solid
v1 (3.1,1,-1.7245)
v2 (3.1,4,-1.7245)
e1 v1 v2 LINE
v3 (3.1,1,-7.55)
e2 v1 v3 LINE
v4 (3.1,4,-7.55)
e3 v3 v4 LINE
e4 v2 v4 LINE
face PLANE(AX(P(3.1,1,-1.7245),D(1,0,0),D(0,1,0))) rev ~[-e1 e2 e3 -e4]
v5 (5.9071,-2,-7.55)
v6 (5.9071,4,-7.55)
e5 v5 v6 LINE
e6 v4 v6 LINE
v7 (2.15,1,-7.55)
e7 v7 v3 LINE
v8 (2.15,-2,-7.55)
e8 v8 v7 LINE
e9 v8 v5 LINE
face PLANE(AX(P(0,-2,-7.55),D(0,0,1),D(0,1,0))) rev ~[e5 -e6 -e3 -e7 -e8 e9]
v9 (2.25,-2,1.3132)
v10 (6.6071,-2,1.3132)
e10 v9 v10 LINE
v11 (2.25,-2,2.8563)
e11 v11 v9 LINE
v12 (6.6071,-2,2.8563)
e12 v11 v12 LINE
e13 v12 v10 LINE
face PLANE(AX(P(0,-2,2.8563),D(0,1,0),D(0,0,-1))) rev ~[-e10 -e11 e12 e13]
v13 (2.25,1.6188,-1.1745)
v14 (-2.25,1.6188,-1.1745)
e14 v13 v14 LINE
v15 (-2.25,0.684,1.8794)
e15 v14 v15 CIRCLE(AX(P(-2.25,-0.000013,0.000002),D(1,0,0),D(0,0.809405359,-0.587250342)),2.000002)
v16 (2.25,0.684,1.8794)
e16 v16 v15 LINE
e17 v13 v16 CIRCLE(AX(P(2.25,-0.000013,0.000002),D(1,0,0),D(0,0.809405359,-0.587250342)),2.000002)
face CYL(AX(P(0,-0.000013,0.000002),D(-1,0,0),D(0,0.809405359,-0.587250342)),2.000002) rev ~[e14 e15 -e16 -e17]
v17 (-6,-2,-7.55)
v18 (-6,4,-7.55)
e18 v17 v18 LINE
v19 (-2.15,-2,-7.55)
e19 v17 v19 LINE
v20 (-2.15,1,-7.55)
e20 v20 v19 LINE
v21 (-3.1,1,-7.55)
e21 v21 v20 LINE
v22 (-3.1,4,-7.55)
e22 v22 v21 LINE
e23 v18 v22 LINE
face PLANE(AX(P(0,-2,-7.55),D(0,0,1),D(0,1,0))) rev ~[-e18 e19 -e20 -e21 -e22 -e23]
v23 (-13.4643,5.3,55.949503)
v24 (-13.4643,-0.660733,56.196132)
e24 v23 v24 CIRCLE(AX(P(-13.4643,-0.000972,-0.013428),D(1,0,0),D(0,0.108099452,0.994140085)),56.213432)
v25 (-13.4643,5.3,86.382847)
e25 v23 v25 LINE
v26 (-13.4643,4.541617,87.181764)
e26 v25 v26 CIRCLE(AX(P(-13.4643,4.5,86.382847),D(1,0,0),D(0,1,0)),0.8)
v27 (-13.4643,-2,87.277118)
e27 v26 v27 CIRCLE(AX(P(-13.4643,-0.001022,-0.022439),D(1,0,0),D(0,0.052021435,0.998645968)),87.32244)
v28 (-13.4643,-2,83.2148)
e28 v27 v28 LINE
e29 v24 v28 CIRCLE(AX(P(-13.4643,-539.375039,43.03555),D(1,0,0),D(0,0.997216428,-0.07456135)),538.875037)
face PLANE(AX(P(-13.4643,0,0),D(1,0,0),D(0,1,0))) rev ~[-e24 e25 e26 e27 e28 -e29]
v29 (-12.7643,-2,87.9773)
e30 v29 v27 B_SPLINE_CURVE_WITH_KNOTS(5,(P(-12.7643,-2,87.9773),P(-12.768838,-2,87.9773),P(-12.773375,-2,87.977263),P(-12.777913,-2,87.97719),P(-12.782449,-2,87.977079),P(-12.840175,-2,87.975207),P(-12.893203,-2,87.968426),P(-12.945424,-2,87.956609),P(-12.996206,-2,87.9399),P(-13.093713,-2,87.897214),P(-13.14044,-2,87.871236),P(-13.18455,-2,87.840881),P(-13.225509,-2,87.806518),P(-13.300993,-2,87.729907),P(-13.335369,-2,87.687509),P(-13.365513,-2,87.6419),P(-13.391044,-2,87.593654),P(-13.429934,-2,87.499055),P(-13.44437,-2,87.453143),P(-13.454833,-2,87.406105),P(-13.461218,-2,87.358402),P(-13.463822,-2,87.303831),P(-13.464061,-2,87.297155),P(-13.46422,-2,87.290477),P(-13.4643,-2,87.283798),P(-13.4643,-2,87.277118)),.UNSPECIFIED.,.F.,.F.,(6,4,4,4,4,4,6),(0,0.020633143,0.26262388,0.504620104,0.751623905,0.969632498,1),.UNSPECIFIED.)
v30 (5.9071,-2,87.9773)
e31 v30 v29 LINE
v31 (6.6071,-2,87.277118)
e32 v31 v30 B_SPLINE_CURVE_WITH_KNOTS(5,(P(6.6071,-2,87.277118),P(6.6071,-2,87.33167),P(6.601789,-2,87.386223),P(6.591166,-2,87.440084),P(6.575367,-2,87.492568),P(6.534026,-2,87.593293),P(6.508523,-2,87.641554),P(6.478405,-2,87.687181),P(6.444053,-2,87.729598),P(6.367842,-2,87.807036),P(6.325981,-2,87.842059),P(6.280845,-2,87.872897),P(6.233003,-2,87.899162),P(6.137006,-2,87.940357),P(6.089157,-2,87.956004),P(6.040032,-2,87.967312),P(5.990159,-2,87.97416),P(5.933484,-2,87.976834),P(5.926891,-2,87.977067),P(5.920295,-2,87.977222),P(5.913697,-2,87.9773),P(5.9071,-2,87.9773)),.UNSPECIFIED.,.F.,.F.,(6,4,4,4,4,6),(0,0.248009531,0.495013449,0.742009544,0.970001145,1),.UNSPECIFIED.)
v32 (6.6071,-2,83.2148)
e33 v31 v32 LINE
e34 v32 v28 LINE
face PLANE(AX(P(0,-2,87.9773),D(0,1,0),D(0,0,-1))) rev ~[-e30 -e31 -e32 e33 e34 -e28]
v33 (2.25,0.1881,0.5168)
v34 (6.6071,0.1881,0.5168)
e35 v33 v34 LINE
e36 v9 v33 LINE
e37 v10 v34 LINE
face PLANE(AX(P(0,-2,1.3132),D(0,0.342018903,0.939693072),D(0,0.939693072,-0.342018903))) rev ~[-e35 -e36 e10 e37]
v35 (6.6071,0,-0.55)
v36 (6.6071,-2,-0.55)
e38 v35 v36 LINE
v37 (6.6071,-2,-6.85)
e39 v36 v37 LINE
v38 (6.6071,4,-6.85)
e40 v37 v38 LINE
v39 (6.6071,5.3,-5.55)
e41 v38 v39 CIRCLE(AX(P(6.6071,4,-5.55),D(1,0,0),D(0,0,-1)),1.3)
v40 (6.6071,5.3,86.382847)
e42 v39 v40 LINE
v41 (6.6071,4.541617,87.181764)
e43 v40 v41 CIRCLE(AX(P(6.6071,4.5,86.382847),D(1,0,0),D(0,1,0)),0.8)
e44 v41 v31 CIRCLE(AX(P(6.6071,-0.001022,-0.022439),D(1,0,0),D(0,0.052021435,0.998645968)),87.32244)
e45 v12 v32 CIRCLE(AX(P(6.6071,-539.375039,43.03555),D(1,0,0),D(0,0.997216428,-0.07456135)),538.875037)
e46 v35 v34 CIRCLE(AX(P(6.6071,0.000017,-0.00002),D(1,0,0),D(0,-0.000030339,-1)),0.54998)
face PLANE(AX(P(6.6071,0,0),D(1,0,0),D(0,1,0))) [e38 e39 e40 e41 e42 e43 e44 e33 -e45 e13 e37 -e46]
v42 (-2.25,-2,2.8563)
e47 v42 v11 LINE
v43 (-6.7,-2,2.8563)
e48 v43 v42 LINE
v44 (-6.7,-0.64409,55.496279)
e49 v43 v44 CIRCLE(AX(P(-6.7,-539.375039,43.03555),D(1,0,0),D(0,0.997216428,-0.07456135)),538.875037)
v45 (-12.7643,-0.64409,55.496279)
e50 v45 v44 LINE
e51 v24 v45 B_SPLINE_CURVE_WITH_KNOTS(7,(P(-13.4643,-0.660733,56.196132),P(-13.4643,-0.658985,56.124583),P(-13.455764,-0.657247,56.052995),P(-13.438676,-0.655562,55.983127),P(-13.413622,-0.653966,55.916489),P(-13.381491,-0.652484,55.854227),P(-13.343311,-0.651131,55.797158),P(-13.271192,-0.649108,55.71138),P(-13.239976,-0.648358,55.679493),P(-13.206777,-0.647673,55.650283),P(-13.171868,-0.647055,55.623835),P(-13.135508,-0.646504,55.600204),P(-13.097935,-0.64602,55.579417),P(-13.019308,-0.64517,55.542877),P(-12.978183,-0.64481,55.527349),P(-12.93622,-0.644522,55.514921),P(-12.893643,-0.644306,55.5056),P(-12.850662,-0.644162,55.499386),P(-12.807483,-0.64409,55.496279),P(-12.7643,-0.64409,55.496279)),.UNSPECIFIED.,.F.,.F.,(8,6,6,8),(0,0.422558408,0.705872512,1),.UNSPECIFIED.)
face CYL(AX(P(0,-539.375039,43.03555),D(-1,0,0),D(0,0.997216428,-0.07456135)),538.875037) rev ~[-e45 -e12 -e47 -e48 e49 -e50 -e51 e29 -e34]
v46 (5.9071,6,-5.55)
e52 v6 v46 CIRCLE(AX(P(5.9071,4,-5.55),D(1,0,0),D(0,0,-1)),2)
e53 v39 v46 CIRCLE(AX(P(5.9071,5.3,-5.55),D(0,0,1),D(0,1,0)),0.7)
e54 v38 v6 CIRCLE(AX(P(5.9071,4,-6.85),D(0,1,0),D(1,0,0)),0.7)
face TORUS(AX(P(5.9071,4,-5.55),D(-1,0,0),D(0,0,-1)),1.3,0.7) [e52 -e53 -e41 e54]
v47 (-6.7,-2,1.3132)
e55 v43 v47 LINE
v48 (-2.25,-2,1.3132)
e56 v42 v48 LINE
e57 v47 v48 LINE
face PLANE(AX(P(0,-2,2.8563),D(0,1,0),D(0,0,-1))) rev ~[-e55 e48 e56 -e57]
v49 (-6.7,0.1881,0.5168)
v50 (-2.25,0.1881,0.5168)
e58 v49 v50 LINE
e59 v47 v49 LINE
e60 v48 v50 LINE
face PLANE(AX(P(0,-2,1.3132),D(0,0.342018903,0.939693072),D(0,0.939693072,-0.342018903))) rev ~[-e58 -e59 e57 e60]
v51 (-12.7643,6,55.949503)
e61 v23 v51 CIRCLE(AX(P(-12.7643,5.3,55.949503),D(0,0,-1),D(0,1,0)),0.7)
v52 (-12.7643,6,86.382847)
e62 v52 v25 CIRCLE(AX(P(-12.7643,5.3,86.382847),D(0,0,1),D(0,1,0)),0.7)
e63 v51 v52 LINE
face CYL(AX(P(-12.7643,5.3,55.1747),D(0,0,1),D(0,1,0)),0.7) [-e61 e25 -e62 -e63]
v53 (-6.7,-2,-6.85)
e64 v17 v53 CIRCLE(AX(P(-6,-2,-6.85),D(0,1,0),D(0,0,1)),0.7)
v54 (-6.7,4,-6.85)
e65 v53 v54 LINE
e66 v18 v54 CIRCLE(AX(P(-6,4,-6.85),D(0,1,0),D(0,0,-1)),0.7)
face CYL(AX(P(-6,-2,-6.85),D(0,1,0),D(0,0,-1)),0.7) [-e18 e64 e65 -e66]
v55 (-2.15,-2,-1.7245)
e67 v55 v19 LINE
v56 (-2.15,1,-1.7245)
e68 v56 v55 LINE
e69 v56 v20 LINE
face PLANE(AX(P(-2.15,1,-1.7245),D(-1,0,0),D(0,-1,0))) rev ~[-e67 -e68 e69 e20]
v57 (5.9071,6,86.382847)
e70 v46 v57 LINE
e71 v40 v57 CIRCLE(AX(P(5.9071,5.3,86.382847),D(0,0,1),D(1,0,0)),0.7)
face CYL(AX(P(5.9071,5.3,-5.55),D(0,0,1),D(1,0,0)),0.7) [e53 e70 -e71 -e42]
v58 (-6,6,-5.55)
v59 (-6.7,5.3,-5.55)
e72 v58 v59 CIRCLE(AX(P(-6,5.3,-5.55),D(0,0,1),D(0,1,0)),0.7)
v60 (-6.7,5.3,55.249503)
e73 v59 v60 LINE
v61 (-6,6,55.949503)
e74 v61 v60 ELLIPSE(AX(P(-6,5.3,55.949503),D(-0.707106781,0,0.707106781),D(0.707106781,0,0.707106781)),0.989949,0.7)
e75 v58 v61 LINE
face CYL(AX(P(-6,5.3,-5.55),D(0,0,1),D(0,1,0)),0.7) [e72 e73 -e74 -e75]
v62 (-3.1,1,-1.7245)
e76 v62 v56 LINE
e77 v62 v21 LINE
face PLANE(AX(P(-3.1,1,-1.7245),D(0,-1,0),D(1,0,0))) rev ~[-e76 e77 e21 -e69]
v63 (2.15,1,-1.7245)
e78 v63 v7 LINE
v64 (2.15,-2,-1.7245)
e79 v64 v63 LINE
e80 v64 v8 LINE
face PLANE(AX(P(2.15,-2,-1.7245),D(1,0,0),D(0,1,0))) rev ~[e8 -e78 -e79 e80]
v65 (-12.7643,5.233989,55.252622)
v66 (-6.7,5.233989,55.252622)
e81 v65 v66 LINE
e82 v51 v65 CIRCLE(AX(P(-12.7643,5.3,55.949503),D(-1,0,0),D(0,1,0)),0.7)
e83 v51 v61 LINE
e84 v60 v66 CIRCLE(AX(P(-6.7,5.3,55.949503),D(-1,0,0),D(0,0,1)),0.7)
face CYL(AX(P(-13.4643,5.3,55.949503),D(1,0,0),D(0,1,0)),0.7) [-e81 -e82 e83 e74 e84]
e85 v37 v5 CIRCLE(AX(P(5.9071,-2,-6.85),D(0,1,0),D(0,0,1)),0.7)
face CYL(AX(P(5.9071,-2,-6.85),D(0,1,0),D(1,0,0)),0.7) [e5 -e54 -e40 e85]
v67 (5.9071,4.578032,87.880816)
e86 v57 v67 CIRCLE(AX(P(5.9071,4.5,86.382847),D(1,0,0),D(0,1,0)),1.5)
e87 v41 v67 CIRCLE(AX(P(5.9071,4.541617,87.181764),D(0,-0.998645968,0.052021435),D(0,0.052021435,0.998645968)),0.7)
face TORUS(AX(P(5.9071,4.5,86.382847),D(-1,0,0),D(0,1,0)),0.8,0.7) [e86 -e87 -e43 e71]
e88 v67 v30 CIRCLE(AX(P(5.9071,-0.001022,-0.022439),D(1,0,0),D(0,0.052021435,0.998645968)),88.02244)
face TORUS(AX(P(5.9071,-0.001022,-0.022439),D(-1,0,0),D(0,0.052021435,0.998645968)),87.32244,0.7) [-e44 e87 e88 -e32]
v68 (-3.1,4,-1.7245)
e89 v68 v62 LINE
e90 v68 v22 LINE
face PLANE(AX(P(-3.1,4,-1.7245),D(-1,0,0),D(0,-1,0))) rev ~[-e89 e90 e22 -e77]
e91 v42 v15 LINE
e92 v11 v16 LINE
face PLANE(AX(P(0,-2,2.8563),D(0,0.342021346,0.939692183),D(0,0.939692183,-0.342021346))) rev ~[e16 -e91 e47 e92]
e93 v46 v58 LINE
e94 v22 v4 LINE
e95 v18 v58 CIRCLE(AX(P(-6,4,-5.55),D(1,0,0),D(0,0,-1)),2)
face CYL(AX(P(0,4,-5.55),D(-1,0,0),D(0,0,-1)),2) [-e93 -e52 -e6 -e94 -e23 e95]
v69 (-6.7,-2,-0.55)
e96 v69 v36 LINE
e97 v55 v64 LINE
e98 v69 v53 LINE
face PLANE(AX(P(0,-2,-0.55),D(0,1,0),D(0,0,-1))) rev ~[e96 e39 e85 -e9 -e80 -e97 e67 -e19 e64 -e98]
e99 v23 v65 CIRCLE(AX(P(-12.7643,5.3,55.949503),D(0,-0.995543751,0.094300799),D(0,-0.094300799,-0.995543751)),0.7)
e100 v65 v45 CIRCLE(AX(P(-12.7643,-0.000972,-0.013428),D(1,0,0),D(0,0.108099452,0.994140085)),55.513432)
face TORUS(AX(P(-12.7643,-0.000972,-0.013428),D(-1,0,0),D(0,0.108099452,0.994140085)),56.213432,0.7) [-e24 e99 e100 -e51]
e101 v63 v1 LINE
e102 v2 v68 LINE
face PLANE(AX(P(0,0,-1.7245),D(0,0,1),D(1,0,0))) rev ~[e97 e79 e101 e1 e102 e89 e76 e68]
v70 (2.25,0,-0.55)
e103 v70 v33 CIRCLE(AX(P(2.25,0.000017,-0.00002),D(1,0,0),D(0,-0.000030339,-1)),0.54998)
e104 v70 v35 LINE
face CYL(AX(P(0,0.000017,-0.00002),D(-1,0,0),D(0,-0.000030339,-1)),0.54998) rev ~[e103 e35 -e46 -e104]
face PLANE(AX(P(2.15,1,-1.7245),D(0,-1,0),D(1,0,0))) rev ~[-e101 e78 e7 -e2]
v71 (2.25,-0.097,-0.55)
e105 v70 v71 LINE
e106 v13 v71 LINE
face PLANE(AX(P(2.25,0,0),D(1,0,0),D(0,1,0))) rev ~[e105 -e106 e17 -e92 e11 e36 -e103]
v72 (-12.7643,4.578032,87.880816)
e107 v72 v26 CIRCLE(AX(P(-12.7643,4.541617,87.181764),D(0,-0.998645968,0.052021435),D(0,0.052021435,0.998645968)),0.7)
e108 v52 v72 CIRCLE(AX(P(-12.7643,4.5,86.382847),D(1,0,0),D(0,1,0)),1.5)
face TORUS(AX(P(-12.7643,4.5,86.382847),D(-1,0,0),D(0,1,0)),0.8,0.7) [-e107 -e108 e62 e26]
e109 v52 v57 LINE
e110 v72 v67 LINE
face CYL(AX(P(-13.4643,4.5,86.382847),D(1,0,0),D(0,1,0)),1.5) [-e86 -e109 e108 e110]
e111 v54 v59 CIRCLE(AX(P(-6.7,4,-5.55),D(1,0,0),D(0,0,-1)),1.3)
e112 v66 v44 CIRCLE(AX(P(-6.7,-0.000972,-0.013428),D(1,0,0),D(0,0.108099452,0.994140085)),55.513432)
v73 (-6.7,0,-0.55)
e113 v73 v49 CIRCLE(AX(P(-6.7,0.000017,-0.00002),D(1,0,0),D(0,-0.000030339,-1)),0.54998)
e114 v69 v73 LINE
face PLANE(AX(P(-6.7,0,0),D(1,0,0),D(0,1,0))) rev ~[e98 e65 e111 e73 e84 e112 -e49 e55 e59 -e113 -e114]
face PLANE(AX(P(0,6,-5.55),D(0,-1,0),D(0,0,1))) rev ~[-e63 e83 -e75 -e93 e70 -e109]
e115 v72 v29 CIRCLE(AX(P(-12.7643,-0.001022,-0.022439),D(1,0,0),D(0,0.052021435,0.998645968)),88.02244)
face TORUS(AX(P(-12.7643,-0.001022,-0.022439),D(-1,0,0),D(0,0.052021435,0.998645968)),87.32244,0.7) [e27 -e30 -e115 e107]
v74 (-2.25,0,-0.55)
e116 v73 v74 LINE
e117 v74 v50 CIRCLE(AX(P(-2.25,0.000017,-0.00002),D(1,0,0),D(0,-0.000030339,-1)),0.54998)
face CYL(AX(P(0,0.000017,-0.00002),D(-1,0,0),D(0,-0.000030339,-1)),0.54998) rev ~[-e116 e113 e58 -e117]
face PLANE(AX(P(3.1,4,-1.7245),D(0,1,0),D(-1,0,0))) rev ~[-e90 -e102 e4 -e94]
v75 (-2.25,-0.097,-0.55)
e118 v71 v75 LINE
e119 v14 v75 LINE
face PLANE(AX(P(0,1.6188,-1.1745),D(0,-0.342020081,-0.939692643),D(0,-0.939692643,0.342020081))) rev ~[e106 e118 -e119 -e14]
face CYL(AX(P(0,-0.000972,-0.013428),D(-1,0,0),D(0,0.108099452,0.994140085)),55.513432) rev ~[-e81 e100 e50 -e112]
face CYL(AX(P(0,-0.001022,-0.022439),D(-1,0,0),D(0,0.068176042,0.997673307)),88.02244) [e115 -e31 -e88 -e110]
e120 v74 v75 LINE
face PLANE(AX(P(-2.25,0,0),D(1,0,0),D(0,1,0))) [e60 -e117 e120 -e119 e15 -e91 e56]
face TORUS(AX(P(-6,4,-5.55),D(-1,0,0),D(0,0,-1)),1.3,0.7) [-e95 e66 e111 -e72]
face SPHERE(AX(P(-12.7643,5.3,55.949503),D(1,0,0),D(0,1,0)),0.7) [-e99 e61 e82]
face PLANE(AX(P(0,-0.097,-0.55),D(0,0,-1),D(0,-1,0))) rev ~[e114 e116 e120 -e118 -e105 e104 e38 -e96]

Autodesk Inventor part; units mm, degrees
ref_plane "YZ Plane" through (0, 0, 0) normal (1, 0, 0) x (0, 1, 0)
ref_plane "XZ Plane" through (0, 0, 0) normal (0, 1, 0) x (-1, 0, 0)
ref_plane "Slot Start Plane" through (0, 0, -1.7245) normal (0, 0, 1) x (1, 0, 0)
sketch "Key Profile" plane through (0, 0, 0) normal (1, 0, 0) x (0, 1, 0)
  line L0 (-2, 2.8563) -> (0.684, 1.8794)
  arc A0 (1.6188, -1.1745) -> (0.684, 1.8794) centre (0, 0) ccw
  line L1 (-2, 1.3132) -> (0.1881, 0.5168)
  arc A1 (0, -0.55) -> (0.1881, 0.5168) centre (0, 0) ccw
  line L2 (-2, 2.8563) -> (-2, -0.55)
  line L3 (0, 0) -> (-2, 0) construction
  line L4 (0, -0.55) -> (-2, -0.55)
  line L5 (1.6188, -1.1745) -> (-0.097, -0.55)
  line L6 (6, -5.55) -> (6, 87.7952)
  line L7 (-2, 87.9773) -> (-2, 2.8563)
  arc A2 (6, 87.7952) -> (-2, 87.9773) centre (0, 0) ccw
  line L8 (-2, -0.55) -> (-2, -7.55)
  arc A3 (4, -7.55) -> (6, -5.55) centre (4, -5.55) ccw
  line L9 (-2, -7.55) -> (4, -7.55)
  arc A4 (6, 55.1747) -> (-2, 55.464) centre (0, 0) ccw
  arc A5 (-2, 2.8563) -> (-2, 83.2148) centre (-539.3737, 43.0355) ccw
  point P0 (-0.5, 43.0355)
  point P1 (-0.6441, 55.4963)
  dimension "my_hingeCutRad" = 0.55
  dimension "my_hingeDepth" = 2
  dimension "my_hingeRegCutRad" = 2
  dimension "keyLength" = 88
  dimension "my_KeyHeight" = 8
  dimension "d107" = 20
  dimension "d122" = 4
  dimension "slotOffset" = 1.1745
  dimension "my_backWidth" = 7
  dimension "d128" = 55.5
  dimension "d135" = 1.5
  dimension "d136" = 4.7625
extrude "Upper (u)" add sketch "Key Profile" along normal blind 6.6071 and the other way blind 6.7 contours A5 A4 L6 A3 L9 L8 L4 L5 A0 L0 | L0 A0 L5 L4 A1 L1 L2
extrude "Lower (d)" add sketch "Key Profile" along normal blind 6.6071 and the other way blind 13.4643 contours A5 L7 A2 L6 A4
extrude "Protrusion Cutout" cut sketch "Key Profile" along normal mid plane 4.5 contours L0 A0 L5 L4 A1 L1 L2
fillet "Front Fillet" radius 1.5 1 edges at (-3.4286, 6, 87.7952)
sketch "Slot Sketch" plane through (0, 0, -1.7245) normal (0, 0, 1) x (1, 0, 0)
  line L0 (2.15, -2) -> (2.15, 1)
  line L1 (3.1, 4) -> (-3.1, 4)
  line L2 (-2.15, 1) -> (-2.15, -2)
  line L3 (-2.15, -2) -> (2.15, -2)
  line L4 (0, -2) -> (0, 4) construction
  line L5 (-3.1, 4) -> (-3.1, 1)
  line L6 (-3.1, 1) -> (-2.15, 1)
  line L7 (2.15, 1) -> (3.1, 1)
  line L8 (3.1, 1) -> (3.1, 4)
  point P0 (0, 0)
  dimension "d109" = 2
  dimension "my_slotHeadOffset" = 1
  dimension "my_slotHeadHeight" = 3
  dimension "my_slotHeadWidth" = 6.2
  dimension "my_neckSlotWidth" = 4.3
extrude "Slot" cut sketch "Slot Sketch" against normal through all
fillet "Edge Softening" radius 0.7 13 edges at (6.6071, 5.4142, -6.9642) (6.6071, 1, -7.55) (6.6071, 6, 40.4164) (-6.7, 5.4142, -6.9642) (-6.7, 1, -7.55) (-6.7, 6, 24.8124) (-13.4643, 5.5879, 87.4156) (-13.4643, 1.2899, 87.9905) (-13.4643, 6, 70.7788) (6.6071, 5.5879, 87.4156) (6.6071, 1.2899, 87.9905) (-13.4643, 2.6828, 55.4351) (-10.0821, 6, 55.1747)
equation "\"my_headHeight\" = 3"
equation "\"my_headOffset\" = 1"
equation "\"whiteKeyWidth\" = 20.07143"
properties part number "EKey0"
